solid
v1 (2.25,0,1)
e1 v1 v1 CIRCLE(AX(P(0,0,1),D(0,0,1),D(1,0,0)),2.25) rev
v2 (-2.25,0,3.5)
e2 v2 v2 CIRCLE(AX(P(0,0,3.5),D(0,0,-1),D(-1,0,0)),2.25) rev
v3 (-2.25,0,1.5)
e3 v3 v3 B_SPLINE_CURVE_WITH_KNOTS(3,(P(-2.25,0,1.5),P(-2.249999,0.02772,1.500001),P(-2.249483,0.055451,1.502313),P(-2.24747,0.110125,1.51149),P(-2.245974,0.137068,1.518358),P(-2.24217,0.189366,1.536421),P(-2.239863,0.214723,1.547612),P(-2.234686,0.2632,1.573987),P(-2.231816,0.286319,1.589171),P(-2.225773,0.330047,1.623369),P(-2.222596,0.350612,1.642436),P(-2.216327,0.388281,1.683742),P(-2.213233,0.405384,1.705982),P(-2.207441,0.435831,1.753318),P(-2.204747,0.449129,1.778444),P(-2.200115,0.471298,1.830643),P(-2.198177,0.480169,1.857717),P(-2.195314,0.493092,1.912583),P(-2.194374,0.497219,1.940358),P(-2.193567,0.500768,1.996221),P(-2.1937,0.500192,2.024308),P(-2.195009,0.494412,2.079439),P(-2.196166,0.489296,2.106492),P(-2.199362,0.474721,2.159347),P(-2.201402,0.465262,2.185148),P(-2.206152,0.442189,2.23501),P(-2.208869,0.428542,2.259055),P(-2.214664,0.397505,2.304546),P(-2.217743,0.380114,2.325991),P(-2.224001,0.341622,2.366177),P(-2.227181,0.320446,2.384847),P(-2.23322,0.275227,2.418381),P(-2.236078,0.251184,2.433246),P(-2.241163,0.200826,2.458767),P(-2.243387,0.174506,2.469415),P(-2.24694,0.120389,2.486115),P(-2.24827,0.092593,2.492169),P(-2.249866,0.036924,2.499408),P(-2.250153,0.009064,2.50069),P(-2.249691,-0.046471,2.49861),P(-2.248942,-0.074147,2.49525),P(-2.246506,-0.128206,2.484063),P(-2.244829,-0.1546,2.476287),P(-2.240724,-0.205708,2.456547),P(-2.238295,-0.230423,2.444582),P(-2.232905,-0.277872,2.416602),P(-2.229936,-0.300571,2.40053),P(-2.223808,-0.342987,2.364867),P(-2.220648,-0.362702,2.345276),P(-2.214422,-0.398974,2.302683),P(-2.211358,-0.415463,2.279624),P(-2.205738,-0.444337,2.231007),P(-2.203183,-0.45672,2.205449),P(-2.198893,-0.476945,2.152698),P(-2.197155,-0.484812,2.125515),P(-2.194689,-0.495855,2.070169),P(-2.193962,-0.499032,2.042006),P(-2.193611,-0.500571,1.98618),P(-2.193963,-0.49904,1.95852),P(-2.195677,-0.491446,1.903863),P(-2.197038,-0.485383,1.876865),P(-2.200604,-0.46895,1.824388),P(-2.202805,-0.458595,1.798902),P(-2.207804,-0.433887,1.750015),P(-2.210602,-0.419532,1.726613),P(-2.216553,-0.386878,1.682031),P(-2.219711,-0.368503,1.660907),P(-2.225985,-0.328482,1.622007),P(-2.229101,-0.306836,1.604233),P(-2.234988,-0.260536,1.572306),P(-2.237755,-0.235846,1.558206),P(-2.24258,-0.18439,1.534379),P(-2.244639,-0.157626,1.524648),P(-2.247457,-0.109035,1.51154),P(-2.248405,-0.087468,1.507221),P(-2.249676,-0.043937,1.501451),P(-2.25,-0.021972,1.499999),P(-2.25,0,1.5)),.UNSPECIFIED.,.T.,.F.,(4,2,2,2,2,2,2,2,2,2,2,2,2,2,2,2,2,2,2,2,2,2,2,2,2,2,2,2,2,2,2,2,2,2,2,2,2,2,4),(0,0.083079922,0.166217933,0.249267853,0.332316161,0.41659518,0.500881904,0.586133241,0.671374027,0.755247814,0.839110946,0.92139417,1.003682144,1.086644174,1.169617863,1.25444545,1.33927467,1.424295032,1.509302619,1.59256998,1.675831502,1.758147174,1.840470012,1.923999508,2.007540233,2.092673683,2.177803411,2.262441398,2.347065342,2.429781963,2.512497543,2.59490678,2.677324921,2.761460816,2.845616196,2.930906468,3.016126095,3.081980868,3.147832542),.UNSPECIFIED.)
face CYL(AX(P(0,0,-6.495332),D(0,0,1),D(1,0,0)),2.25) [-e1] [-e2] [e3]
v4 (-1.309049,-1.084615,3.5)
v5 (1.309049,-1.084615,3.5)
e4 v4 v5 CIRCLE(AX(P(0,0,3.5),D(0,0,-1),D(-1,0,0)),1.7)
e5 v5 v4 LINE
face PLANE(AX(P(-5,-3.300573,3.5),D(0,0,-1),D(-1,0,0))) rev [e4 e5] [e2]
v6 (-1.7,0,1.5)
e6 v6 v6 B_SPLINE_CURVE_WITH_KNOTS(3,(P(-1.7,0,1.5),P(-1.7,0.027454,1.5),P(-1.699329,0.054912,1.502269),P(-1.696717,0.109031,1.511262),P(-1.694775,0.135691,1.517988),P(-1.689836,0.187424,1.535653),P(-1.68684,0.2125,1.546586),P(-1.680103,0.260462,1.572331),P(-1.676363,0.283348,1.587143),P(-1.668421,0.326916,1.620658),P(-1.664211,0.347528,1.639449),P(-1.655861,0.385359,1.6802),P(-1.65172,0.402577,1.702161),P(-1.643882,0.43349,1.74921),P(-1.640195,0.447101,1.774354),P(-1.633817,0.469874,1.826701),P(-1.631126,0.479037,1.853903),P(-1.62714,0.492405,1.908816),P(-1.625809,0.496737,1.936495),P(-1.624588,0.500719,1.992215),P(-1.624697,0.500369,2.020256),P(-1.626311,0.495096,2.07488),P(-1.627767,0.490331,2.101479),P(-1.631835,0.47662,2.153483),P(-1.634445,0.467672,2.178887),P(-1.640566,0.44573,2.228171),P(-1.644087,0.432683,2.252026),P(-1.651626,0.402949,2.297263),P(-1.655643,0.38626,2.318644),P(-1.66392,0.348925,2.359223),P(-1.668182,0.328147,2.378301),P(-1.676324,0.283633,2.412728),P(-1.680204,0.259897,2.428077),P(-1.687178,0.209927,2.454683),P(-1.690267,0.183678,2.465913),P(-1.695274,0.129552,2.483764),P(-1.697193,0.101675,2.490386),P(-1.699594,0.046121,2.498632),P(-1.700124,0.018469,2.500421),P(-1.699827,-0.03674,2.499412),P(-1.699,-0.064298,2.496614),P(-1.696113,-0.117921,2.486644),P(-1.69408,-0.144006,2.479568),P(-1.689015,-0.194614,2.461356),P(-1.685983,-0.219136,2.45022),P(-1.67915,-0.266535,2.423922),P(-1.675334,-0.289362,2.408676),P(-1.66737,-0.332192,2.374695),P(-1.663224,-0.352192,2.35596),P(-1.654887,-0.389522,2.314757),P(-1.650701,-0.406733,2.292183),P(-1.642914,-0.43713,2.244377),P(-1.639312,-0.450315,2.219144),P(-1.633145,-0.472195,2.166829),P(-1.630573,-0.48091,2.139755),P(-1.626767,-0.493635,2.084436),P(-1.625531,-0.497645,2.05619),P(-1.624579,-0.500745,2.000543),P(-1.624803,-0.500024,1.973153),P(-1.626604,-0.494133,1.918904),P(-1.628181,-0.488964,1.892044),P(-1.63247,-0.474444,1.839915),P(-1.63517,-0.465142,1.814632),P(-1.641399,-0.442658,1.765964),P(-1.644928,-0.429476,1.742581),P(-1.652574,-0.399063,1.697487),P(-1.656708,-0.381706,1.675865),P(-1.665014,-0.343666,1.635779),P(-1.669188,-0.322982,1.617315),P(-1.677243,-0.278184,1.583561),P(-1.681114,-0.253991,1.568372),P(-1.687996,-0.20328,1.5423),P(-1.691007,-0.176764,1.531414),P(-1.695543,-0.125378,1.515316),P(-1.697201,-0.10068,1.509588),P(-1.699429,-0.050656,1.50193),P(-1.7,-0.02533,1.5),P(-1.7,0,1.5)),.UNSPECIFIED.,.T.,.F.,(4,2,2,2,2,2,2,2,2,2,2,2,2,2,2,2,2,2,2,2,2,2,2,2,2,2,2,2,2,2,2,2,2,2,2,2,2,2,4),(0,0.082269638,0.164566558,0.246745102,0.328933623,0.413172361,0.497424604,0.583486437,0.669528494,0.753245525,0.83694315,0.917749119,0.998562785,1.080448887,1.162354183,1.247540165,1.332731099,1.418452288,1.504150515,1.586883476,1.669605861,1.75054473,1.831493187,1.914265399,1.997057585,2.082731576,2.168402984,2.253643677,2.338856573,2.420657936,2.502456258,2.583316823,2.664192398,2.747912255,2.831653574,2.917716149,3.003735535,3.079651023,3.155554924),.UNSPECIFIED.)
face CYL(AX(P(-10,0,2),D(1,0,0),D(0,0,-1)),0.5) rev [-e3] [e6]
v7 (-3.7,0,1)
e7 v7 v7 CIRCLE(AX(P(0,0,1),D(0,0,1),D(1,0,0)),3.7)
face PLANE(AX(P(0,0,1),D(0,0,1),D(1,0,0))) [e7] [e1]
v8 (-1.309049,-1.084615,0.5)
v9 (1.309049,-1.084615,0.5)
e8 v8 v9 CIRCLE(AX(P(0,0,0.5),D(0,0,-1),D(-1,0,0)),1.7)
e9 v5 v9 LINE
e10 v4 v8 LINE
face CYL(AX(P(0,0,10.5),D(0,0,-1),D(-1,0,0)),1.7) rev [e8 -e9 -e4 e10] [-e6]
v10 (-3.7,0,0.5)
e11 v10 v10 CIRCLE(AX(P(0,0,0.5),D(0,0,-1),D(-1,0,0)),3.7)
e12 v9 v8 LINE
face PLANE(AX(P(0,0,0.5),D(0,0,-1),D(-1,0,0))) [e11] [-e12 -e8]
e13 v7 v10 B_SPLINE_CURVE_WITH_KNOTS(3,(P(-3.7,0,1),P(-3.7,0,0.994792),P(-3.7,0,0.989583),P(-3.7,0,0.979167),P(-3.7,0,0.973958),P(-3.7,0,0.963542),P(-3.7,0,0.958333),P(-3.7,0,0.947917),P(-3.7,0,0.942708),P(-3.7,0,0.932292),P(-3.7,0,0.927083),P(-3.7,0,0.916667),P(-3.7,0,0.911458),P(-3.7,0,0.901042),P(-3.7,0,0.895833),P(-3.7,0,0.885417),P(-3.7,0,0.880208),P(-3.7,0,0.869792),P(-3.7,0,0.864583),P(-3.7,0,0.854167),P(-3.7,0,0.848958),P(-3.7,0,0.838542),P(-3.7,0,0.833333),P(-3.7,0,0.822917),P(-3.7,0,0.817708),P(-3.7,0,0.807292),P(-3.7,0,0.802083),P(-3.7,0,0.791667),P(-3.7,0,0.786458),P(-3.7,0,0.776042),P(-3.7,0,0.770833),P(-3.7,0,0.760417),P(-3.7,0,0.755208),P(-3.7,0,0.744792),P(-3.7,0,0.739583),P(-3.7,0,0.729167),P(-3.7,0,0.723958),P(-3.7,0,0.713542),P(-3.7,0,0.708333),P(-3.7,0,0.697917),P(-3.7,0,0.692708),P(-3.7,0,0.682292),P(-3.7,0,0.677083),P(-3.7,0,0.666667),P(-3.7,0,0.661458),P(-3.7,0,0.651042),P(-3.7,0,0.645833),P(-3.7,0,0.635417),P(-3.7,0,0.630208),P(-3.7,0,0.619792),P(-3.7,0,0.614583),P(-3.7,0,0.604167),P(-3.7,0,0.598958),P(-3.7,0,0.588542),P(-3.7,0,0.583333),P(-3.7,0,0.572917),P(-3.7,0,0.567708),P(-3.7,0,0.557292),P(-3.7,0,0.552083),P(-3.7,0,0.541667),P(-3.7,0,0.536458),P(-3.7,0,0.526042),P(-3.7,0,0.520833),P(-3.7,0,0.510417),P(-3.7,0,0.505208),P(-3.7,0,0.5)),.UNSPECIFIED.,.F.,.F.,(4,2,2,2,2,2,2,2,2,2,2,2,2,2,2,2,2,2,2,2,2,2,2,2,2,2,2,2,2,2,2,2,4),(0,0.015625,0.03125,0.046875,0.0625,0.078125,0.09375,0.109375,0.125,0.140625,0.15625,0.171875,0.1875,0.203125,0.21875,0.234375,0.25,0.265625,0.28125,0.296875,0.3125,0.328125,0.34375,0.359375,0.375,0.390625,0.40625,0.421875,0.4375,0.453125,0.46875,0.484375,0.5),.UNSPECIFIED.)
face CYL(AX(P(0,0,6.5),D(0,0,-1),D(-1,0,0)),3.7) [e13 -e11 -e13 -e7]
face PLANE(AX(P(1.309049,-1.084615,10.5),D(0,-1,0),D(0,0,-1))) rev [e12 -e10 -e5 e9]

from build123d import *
from build123d.topology import SkipClean

# Parameters (mm, degrees)
ESBO_O1_R                    = 3.7
RESSALTO_EXTRUS_O2_DEPTH     = 6.5
ESBO_O2_R                    = 1.875
CORTE_EXTRUS_O1_DEPTH        = 0.6
ESBO_O3_R                    = 5
ESBO_O3_R_2                  = 2.415
CORTE_EXTRUS_O2_DEPTH        = 5.5
ESBO_O6_R                    = 2.05
CORTE_EXTRUS_O6_DEPTH        = 0.9
ESBO_O7_R                    = 2.415
ESBO_O7_R_2                  = 2.1
CORTE_EXTRUS_O7_DEPTH        = 5.5
RESSALTO_EXTRUS_O3_START     = 3.5
ESBO_O8_R                    = 2.25
ESBO_O8_R_2                  = 2.1
RESSALTO_EXTRUS_O3_DEPTH     = 3.5
RESSALTO_EXTRUS_O4_START     = 3.5
ESBO_O11_R                   = 2.65
ESBO_O11_R_2                 = 2.25
RESSALTO_EXTRUS_O4_DEPTH     = 3.5
ESBO_O9_R                    = 0.5
CORTE_EXTRUS_O8_DEPTH        = 10
ESBO_O13_R                   = 3.7
CORTE_EXTRUS_O10_DEPTH       = 0.5
ESBO_O14_R                   = 2.05
CORTE_EXTRUS_O11_DEPTH       = 0.4
ESBO_O15_W                   = 5.3
ESBO_O15_H                   = 2.277962938
CORTE_EXTRUS_O12_DEPTH       = 5.2
RESSALTO_EXTRUS_O6_START     = 0.8
ESBO_O17_R                   = 2.05
RESSALTO_EXTRUS_O6_DEPTH     = 0.8
CORTE_EXTRUS_O13_START       = -3.5
CORTE_EXTRUS_O13_OUTLINE_R   = 2.65
CORTE_EXTRUS_O13_OUTLINE_R_2 = 2.25
CORTE_EXTRUS_O13_DEPTH       = 3.5
ESBO_O19_W                   = 1.26014474
ESBO_O19_H                   = 6.353969252
CORTE_EXTRUS_O14_DEPTH       = 5
CORTE_EXTRUS_O15_DEPTH       = 10


# Read off the part's stored shape, not the designer's step: Corte-extrusão13
with BuildPart() as part:
    # Esboço1 → Ressalto-extrusão2 (new body)
    with BuildSketch(Plane.XY):
        with Locations(Location((0, 0, 0), (0, 0, 180))):
            Circle(ESBO_O1_R)
        with BuildLine():
            Line((-1.211385827, -0.884615385), (1.211385827, -0.884615385))
            ThreePointArc((1.211385827, -0.884615385), (0, 1.5), (-1.211385827, -0.884615385))
        make_face(mode=Mode.SUBTRACT)
    extrude(amount=RESSALTO_EXTRUS_O2_DEPTH)

    # Esboço2 → Corte-extrusão1 (cut)
    with BuildSketch(Plane(origin=(0, 0, 0), x_dir=(-1, 0, 0), z_dir=(0, 0, -1))):
        Circle(ESBO_O2_R)
    extrude(amount=-CORTE_EXTRUS_O1_DEPTH, mode=Mode.SUBTRACT)

    # Esboço3 → Corte-extrusão2 (cut)
    with BuildSketch(Plane.XY.offset(6.5)):
        Circle(ESBO_O3_R)
        Circle(ESBO_O3_R_2, mode=Mode.SUBTRACT)
    extrude(amount=-CORTE_EXTRUS_O2_DEPTH, mode=Mode.SUBTRACT)

    # Esboço6 → Corte-extrusão6 (cut)
    with BuildSketch(Plane(origin=(0, 0, 0), x_dir=(-1, 0, 0), z_dir=(0, 0, -1))):
        Circle(ESBO_O6_R)
    extrude(amount=-CORTE_EXTRUS_O6_DEPTH, mode=Mode.SUBTRACT)

    # Esboço7 → Corte-extrusão7 (cut)
    with BuildSketch(Plane.XY.offset(6.5)):
        Circle(ESBO_O7_R)
        Circle(ESBO_O7_R_2, mode=Mode.SUBTRACT)
    extrude(amount=-CORTE_EXTRUS_O7_DEPTH, mode=Mode.SUBTRACT)

    # Esboço8 → Ressalto-extrusão3 (add)
    with BuildSketch(Plane.XY.offset(1).offset(RESSALTO_EXTRUS_O3_START)):
        Circle(ESBO_O8_R)
        Circle(ESBO_O8_R_2, mode=Mode.SUBTRACT)
    extrude(amount=-RESSALTO_EXTRUS_O3_DEPTH)

    # Esboço11 → Ressalto-extrusão4 (add)
    with BuildSketch(Plane.XY.offset(1).offset(RESSALTO_EXTRUS_O4_START)):
        Circle(ESBO_O11_R)
        Circle(ESBO_O11_R_2, mode=Mode.SUBTRACT)
    extrude(amount=-RESSALTO_EXTRUS_O4_DEPTH)

    # Esboço9 → Corte-extrusão8 (cut)
    with BuildSketch(Plane(origin=(0, 0, 0), x_dir=(0, 0, -1), z_dir=(1, 0, 0))):
        with Locations((-2, 0)):
            Circle(ESBO_O9_R)
    extrude(amount=-CORTE_EXTRUS_O8_DEPTH, mode=Mode.SUBTRACT)

    # Esboço13 → Corte-extrusão10 (cut)
    with BuildSketch(Plane(origin=(0, 0, 0), x_dir=(-1, 0, 0), z_dir=(0, 0, -1))):
        Circle(ESBO_O13_R)
    extrude(amount=-CORTE_EXTRUS_O10_DEPTH, mode=Mode.SUBTRACT)

    # Esboço14 → Corte-extrusão11 (cut)
    with BuildSketch(Plane(origin=(0, 0, 0.9), x_dir=(-1, 0, 0), z_dir=(0, 0, -1))):
        Circle(ESBO_O14_R)
    extrude(amount=-CORTE_EXTRUS_O11_DEPTH, mode=Mode.SUBTRACT)

    # Esboço15 → Corte-extrusão12 (cut, symmetric)
    with BuildSketch(Plane(origin=(0, 0, 0), x_dir=(1, 0, 0), z_dir=(0, 1, 0))):
        with Locations((0, -5.638981469)):
            Rectangle(ESBO_O15_W, ESBO_O15_H)
    extrude(amount=CORTE_EXTRUS_O12_DEPTH, both=True, mode=Mode.SUBTRACT)

    # Esboço17 → Ressalto-extrusão6 (add)
    with SkipClean():  # the faces are left unmerged after this step: merging them gives an invalid solid
        with BuildSketch(Plane(origin=(0, 0, 1.3), x_dir=(-1, 0, 0), z_dir=(0, 0, -1)).offset(RESSALTO_EXTRUS_O6_START)):
            Circle(ESBO_O17_R)
            with BuildLine():
                Line((-1.211385827, -0.884615385), (1.211385827, -0.884615385))
                ThreePointArc((1.211385827, -0.884615385), (0, 1.5), (-1.211385827, -0.884615385))
            make_face(mode=Mode.SUBTRACT)
        extrude(amount=-RESSALTO_EXTRUS_O6_DEPTH)

    # Corte-extrusão13 outline → Corte-extrusão13 (cut)
    with SkipClean():  # the faces are left unmerged after this step: merging them gives an invalid solid
        with BuildSketch(Plane.XY.offset(4.5).offset(CORTE_EXTRUS_O13_START)):
            Circle(CORTE_EXTRUS_O13_OUTLINE_R)
            Circle(CORTE_EXTRUS_O13_OUTLINE_R_2, mode=Mode.SUBTRACT)
        extrude(amount=CORTE_EXTRUS_O13_DEPTH, mode=Mode.SUBTRACT)

    # Esboço19 → Corte-extrusão14 (cut, symmetric)
    with SkipClean():  # the faces are left unmerged after this step: merging them gives an invalid solid
        with BuildSketch(Plane(origin=(0, 0, 0), x_dir=(0, 0, -1), z_dir=(1, 0, 0))):
            with Locations((-4.13007237, -0.123588244)):
                Rectangle(ESBO_O19_W, ESBO_O19_H)
        extrude(amount=CORTE_EXTRUS_O14_DEPTH, both=True, mode=Mode.SUBTRACT)

    # Esboço20 → Corte-extrusão15 (cut)
    with BuildSketch(Plane(origin=(0, 0, 0.5), x_dir=(-1, 0, 0), z_dir=(0, 0, -1))):
        with BuildLine():
            Line((-1.30904907, -1.084615385), (1.30904907, -1.084615385))
            ThreePointArc((1.30904907, -1.084615385), (0, 1.7), (-1.30904907, -1.084615385))
        make_face()
    extrude(amount=-CORTE_EXTRUS_O15_DEPTH, mode=Mode.SUBTRACT)


solid = part.part
